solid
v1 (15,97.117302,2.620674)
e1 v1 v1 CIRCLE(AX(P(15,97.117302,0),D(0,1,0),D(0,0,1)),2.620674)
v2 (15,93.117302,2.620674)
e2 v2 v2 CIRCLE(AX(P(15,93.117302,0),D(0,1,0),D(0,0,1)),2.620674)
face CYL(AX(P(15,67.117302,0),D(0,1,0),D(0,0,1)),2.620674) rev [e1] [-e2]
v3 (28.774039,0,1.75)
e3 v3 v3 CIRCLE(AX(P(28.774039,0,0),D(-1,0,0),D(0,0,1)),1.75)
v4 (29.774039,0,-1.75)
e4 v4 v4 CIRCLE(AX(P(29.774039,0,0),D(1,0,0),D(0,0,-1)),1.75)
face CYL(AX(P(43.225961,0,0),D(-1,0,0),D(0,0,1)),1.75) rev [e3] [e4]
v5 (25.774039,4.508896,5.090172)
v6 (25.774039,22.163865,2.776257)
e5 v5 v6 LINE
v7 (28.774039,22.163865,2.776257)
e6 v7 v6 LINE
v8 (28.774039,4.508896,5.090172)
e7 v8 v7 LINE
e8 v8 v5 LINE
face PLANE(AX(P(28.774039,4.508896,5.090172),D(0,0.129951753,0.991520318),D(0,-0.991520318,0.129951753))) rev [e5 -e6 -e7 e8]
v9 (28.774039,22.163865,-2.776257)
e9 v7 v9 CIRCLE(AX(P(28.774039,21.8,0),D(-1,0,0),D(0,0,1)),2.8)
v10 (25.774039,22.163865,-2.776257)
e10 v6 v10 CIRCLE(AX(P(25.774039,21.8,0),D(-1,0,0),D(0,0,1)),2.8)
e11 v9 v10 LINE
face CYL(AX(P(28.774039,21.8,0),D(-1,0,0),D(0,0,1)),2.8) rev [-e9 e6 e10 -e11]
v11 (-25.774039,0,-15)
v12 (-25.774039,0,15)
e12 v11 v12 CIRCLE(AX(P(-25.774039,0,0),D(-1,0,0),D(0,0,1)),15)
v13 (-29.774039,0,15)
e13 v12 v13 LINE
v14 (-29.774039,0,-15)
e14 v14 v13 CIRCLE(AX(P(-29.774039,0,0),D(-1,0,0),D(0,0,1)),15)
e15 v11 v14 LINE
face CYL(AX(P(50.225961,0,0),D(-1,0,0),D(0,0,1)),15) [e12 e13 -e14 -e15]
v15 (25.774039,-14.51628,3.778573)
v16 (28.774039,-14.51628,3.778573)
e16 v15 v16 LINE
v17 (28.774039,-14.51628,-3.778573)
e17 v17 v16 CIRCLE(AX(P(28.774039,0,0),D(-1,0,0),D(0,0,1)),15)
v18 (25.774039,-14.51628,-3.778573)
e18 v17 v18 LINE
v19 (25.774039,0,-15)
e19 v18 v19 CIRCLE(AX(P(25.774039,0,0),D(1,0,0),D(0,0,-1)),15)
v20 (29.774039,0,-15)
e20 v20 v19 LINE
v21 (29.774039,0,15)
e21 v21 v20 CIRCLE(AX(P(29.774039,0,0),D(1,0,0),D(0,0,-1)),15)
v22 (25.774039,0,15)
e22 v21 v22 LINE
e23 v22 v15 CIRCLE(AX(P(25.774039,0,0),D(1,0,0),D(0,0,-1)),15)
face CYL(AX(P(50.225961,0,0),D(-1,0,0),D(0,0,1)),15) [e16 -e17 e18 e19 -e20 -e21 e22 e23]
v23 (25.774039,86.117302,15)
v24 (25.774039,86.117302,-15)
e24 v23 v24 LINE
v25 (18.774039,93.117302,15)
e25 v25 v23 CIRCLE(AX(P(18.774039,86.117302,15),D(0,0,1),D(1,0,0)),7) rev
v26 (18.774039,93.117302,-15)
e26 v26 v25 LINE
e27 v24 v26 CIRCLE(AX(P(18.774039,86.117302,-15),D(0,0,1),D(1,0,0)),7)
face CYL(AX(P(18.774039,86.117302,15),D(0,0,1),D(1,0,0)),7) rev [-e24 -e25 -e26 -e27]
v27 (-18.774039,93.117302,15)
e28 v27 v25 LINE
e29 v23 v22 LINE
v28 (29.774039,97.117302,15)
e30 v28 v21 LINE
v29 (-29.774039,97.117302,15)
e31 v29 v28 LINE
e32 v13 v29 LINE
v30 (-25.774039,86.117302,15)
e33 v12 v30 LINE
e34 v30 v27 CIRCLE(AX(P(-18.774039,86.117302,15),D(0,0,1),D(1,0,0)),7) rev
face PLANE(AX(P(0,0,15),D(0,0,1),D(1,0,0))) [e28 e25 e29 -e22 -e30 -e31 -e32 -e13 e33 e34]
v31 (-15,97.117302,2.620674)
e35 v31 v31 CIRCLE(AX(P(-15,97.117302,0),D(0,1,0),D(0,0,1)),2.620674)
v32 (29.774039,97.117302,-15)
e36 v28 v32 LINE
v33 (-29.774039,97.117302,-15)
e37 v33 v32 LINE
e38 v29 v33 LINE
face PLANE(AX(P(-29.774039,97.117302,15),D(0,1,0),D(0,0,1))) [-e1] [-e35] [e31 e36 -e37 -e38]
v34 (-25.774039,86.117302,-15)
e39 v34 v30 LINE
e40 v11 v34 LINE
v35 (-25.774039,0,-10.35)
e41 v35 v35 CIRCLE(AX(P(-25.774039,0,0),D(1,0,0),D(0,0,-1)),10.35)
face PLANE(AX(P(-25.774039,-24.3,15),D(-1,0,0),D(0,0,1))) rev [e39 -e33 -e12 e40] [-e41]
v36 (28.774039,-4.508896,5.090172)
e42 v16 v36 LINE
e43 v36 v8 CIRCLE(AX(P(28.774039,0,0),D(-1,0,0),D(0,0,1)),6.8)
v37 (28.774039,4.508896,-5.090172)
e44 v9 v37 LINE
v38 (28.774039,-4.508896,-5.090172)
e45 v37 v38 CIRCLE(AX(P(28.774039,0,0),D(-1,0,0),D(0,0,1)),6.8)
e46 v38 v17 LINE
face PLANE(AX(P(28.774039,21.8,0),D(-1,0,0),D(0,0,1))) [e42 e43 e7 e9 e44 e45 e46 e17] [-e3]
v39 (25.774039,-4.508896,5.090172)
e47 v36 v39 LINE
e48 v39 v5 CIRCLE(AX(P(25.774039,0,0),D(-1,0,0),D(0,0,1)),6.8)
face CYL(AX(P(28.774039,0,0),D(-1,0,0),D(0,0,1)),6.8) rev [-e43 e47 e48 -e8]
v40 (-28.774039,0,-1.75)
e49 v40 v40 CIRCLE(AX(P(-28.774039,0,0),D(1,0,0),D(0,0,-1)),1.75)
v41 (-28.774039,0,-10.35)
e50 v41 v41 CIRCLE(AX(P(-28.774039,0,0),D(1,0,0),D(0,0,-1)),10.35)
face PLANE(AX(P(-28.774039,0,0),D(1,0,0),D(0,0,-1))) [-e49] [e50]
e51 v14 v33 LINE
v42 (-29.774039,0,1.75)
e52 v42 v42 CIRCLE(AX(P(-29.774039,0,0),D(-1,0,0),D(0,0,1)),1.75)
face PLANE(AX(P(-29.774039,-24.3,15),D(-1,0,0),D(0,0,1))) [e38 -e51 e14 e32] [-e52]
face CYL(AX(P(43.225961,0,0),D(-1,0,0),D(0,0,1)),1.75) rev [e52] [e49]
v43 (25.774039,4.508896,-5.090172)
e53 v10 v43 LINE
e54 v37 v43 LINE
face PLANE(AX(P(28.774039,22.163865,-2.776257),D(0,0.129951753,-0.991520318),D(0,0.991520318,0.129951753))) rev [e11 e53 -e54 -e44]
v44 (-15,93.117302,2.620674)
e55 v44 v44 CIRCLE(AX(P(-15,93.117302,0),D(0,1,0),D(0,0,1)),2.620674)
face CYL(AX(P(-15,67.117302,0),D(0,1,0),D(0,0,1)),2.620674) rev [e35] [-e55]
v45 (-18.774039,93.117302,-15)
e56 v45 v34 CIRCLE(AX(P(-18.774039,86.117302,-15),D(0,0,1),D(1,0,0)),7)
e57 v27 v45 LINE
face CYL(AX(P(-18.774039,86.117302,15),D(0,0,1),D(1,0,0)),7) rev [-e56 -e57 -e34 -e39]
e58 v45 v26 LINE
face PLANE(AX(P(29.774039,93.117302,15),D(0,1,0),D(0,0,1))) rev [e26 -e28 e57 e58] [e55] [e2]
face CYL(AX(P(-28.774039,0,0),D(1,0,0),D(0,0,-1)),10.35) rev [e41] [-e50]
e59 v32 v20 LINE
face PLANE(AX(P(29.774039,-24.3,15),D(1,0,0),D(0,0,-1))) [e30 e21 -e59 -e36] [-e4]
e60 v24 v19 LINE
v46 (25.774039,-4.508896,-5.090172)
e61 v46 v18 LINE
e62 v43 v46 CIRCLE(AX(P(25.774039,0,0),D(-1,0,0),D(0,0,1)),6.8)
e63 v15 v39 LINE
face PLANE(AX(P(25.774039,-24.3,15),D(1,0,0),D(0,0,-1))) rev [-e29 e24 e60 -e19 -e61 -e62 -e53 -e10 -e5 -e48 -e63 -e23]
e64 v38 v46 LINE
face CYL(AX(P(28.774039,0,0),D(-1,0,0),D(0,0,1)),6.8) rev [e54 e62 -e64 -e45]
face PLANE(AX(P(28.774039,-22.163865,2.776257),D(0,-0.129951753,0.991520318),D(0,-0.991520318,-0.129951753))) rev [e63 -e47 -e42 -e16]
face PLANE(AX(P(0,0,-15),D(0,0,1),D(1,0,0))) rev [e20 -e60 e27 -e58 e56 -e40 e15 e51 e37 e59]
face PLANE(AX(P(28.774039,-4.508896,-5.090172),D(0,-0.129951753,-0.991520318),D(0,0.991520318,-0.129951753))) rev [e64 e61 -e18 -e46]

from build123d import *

# Parameters (mm, degrees)
EXTRUDE_2_DEPTH     = 15
SKETCH_2_R          = 2.62067407
CUT_EXTRUDE_1_DEPTH = 30
CUT_EXTRUDE_2_DEPTH = 3
SKETCH_5_R          = 10.35
CUT_EXTRUDE_3_DEPTH = 3
SKETCH_6_R          = 1.75
CUT_EXTRUDE_4_DEPTH = 73
FILLET_1_R          = 7
FILLET_2_R          = 15
CUT_EXTRUDE_5_DEPTH = 80


with BuildPart() as part:
    # 草图1 → 拉伸-薄壁2 (new, symmetric)
    with BuildSketch(Plane.XY):
        Polygon((29.774038515, -24.3), (29.774038515, 97.117302362), (0, 97.117302362), (-29.774038515, 97.117302362), (-29.774038515, -24.3), (-25.774038515, -24.3), (-25.774038515, 93.117302362), (0, 93.117302362), (25.774038515, 93.117302362), (25.774038515, -24.3), align=None)
    extrude(amount=EXTRUDE_2_DEPTH, both=True)

    # 草图2 → 切除-拉伸1 (cut)
    with BuildSketch(Plane(origin=(0, 97.117302362, 0), x_dir=(1, 0, 0), z_dir=(0, 1, 0))):
        with Locations(Location((-15, 0, 0), (0, 0, 270))):
            Circle(SKETCH_2_R)
        with Locations(Location((15, 0, 0), (0, 0, 270))):
            Circle(SKETCH_2_R)
    extrude(amount=-CUT_EXTRUDE_1_DEPTH, mode=Mode.SUBTRACT)

    # 草图4 → 切除-拉伸2 (cut)
    with BuildSketch(Plane.ZY.offset(-25.774038515)):
        with BuildLine():
            Line((-2.776256892, 22.163864907), (-5.090172263, 4.508896355))
            ThreePointArc((-5.090172263, 4.508896355), (-6.8, 0), (-5.090172263, -4.508896355))
            Line((-5.090172263, -4.508896355), (-2.776256892, -22.163864907))
            ThreePointArc((-2.776256892, -22.163864907), (0, -24.6), (2.776256892, -22.163864907))
            Line((2.776256892, -22.163864907), (5.090172263, -4.508896355))
            ThreePointArc((5.090172263, -4.508896355), (6.8, 0), (5.090172263, 4.508896355))
            Line((5.090172263, 4.508896355), (2.776256892, 22.163864907))
            ThreePointArc((2.776256892, 22.163864907), (0, 24.6), (-2.776256892, 22.163864907))
        make_face()
    extrude(amount=-CUT_EXTRUDE_2_DEPTH, mode=Mode.SUBTRACT)

    # 草图5 → 切除-拉伸3 (cut)
    with BuildSketch(Plane(origin=(-25.774038515, 0, 0), x_dir=(0, 0, -1), z_dir=(1, 0, 0))):
        Circle(SKETCH_5_R)
    extrude(amount=-CUT_EXTRUDE_3_DEPTH, mode=Mode.SUBTRACT)

    # 草图6 → 切除-拉伸4 (cut)
    with BuildSketch(Plane.ZY.offset(29.774038515)):
        Circle(SKETCH_6_R)
    extrude(amount=-CUT_EXTRUDE_4_DEPTH, mode=Mode.SUBTRACT)

    # 圆角1
    fillet_1_edges = [part.edges().sort_by_distance(p)[0] for p in [
        (25.774038515, 93.117302362, 0),
        (-25.774038515, 93.117302362, 0),
    ]]
    fillet(fillet_1_edges, radius=FILLET_1_R)

    # 圆角2
    fillet_2_edges = [part.edges().sort_by_distance(p)[0] for p in [
        (27.774038515, -24.3, -15),
        (-27.774038515, -24.3, -15),
        (-27.774038515, -24.3, 15),
        (27.774038515, -24.3, 15),
    ]]
    fillet(fillet_2_edges, radius=FILLET_2_R - 0.0001)  # a hair under: the kernel refuses the full size

    # 草图7 → 切除-拉伸5 (cut)
    with BuildSketch(Plane.ZY.offset(29.774038515)):
        with BuildLine():
            ThreePointArc((15, 0), (0, -15), (-15, 0))
            Line((-15, 0), (-15, -9.3))
            ThreePointArc((-15, -9.3), (-10.606601718, -19.906601718), (0, -24.3))
            ThreePointArc((0, -24.3), (10.606601718, -19.906601718), (15, -9.3))
            Line((15, -9.3), (15, 0))
        make_face()
    extrude(amount=-CUT_EXTRUDE_5_DEPTH, mode=Mode.SUBTRACT)


with BuildPart() as cut_extrude_5_kept_piece:
    # of the separate pieces the step leaves, the one the design keeps (cut_extrude_5_pieces_kept)
    add(part.part.solids().sort_by_distance((-29.774038515, 0, -15))[0])


solid = cut_extrude_5_kept_piece.part
